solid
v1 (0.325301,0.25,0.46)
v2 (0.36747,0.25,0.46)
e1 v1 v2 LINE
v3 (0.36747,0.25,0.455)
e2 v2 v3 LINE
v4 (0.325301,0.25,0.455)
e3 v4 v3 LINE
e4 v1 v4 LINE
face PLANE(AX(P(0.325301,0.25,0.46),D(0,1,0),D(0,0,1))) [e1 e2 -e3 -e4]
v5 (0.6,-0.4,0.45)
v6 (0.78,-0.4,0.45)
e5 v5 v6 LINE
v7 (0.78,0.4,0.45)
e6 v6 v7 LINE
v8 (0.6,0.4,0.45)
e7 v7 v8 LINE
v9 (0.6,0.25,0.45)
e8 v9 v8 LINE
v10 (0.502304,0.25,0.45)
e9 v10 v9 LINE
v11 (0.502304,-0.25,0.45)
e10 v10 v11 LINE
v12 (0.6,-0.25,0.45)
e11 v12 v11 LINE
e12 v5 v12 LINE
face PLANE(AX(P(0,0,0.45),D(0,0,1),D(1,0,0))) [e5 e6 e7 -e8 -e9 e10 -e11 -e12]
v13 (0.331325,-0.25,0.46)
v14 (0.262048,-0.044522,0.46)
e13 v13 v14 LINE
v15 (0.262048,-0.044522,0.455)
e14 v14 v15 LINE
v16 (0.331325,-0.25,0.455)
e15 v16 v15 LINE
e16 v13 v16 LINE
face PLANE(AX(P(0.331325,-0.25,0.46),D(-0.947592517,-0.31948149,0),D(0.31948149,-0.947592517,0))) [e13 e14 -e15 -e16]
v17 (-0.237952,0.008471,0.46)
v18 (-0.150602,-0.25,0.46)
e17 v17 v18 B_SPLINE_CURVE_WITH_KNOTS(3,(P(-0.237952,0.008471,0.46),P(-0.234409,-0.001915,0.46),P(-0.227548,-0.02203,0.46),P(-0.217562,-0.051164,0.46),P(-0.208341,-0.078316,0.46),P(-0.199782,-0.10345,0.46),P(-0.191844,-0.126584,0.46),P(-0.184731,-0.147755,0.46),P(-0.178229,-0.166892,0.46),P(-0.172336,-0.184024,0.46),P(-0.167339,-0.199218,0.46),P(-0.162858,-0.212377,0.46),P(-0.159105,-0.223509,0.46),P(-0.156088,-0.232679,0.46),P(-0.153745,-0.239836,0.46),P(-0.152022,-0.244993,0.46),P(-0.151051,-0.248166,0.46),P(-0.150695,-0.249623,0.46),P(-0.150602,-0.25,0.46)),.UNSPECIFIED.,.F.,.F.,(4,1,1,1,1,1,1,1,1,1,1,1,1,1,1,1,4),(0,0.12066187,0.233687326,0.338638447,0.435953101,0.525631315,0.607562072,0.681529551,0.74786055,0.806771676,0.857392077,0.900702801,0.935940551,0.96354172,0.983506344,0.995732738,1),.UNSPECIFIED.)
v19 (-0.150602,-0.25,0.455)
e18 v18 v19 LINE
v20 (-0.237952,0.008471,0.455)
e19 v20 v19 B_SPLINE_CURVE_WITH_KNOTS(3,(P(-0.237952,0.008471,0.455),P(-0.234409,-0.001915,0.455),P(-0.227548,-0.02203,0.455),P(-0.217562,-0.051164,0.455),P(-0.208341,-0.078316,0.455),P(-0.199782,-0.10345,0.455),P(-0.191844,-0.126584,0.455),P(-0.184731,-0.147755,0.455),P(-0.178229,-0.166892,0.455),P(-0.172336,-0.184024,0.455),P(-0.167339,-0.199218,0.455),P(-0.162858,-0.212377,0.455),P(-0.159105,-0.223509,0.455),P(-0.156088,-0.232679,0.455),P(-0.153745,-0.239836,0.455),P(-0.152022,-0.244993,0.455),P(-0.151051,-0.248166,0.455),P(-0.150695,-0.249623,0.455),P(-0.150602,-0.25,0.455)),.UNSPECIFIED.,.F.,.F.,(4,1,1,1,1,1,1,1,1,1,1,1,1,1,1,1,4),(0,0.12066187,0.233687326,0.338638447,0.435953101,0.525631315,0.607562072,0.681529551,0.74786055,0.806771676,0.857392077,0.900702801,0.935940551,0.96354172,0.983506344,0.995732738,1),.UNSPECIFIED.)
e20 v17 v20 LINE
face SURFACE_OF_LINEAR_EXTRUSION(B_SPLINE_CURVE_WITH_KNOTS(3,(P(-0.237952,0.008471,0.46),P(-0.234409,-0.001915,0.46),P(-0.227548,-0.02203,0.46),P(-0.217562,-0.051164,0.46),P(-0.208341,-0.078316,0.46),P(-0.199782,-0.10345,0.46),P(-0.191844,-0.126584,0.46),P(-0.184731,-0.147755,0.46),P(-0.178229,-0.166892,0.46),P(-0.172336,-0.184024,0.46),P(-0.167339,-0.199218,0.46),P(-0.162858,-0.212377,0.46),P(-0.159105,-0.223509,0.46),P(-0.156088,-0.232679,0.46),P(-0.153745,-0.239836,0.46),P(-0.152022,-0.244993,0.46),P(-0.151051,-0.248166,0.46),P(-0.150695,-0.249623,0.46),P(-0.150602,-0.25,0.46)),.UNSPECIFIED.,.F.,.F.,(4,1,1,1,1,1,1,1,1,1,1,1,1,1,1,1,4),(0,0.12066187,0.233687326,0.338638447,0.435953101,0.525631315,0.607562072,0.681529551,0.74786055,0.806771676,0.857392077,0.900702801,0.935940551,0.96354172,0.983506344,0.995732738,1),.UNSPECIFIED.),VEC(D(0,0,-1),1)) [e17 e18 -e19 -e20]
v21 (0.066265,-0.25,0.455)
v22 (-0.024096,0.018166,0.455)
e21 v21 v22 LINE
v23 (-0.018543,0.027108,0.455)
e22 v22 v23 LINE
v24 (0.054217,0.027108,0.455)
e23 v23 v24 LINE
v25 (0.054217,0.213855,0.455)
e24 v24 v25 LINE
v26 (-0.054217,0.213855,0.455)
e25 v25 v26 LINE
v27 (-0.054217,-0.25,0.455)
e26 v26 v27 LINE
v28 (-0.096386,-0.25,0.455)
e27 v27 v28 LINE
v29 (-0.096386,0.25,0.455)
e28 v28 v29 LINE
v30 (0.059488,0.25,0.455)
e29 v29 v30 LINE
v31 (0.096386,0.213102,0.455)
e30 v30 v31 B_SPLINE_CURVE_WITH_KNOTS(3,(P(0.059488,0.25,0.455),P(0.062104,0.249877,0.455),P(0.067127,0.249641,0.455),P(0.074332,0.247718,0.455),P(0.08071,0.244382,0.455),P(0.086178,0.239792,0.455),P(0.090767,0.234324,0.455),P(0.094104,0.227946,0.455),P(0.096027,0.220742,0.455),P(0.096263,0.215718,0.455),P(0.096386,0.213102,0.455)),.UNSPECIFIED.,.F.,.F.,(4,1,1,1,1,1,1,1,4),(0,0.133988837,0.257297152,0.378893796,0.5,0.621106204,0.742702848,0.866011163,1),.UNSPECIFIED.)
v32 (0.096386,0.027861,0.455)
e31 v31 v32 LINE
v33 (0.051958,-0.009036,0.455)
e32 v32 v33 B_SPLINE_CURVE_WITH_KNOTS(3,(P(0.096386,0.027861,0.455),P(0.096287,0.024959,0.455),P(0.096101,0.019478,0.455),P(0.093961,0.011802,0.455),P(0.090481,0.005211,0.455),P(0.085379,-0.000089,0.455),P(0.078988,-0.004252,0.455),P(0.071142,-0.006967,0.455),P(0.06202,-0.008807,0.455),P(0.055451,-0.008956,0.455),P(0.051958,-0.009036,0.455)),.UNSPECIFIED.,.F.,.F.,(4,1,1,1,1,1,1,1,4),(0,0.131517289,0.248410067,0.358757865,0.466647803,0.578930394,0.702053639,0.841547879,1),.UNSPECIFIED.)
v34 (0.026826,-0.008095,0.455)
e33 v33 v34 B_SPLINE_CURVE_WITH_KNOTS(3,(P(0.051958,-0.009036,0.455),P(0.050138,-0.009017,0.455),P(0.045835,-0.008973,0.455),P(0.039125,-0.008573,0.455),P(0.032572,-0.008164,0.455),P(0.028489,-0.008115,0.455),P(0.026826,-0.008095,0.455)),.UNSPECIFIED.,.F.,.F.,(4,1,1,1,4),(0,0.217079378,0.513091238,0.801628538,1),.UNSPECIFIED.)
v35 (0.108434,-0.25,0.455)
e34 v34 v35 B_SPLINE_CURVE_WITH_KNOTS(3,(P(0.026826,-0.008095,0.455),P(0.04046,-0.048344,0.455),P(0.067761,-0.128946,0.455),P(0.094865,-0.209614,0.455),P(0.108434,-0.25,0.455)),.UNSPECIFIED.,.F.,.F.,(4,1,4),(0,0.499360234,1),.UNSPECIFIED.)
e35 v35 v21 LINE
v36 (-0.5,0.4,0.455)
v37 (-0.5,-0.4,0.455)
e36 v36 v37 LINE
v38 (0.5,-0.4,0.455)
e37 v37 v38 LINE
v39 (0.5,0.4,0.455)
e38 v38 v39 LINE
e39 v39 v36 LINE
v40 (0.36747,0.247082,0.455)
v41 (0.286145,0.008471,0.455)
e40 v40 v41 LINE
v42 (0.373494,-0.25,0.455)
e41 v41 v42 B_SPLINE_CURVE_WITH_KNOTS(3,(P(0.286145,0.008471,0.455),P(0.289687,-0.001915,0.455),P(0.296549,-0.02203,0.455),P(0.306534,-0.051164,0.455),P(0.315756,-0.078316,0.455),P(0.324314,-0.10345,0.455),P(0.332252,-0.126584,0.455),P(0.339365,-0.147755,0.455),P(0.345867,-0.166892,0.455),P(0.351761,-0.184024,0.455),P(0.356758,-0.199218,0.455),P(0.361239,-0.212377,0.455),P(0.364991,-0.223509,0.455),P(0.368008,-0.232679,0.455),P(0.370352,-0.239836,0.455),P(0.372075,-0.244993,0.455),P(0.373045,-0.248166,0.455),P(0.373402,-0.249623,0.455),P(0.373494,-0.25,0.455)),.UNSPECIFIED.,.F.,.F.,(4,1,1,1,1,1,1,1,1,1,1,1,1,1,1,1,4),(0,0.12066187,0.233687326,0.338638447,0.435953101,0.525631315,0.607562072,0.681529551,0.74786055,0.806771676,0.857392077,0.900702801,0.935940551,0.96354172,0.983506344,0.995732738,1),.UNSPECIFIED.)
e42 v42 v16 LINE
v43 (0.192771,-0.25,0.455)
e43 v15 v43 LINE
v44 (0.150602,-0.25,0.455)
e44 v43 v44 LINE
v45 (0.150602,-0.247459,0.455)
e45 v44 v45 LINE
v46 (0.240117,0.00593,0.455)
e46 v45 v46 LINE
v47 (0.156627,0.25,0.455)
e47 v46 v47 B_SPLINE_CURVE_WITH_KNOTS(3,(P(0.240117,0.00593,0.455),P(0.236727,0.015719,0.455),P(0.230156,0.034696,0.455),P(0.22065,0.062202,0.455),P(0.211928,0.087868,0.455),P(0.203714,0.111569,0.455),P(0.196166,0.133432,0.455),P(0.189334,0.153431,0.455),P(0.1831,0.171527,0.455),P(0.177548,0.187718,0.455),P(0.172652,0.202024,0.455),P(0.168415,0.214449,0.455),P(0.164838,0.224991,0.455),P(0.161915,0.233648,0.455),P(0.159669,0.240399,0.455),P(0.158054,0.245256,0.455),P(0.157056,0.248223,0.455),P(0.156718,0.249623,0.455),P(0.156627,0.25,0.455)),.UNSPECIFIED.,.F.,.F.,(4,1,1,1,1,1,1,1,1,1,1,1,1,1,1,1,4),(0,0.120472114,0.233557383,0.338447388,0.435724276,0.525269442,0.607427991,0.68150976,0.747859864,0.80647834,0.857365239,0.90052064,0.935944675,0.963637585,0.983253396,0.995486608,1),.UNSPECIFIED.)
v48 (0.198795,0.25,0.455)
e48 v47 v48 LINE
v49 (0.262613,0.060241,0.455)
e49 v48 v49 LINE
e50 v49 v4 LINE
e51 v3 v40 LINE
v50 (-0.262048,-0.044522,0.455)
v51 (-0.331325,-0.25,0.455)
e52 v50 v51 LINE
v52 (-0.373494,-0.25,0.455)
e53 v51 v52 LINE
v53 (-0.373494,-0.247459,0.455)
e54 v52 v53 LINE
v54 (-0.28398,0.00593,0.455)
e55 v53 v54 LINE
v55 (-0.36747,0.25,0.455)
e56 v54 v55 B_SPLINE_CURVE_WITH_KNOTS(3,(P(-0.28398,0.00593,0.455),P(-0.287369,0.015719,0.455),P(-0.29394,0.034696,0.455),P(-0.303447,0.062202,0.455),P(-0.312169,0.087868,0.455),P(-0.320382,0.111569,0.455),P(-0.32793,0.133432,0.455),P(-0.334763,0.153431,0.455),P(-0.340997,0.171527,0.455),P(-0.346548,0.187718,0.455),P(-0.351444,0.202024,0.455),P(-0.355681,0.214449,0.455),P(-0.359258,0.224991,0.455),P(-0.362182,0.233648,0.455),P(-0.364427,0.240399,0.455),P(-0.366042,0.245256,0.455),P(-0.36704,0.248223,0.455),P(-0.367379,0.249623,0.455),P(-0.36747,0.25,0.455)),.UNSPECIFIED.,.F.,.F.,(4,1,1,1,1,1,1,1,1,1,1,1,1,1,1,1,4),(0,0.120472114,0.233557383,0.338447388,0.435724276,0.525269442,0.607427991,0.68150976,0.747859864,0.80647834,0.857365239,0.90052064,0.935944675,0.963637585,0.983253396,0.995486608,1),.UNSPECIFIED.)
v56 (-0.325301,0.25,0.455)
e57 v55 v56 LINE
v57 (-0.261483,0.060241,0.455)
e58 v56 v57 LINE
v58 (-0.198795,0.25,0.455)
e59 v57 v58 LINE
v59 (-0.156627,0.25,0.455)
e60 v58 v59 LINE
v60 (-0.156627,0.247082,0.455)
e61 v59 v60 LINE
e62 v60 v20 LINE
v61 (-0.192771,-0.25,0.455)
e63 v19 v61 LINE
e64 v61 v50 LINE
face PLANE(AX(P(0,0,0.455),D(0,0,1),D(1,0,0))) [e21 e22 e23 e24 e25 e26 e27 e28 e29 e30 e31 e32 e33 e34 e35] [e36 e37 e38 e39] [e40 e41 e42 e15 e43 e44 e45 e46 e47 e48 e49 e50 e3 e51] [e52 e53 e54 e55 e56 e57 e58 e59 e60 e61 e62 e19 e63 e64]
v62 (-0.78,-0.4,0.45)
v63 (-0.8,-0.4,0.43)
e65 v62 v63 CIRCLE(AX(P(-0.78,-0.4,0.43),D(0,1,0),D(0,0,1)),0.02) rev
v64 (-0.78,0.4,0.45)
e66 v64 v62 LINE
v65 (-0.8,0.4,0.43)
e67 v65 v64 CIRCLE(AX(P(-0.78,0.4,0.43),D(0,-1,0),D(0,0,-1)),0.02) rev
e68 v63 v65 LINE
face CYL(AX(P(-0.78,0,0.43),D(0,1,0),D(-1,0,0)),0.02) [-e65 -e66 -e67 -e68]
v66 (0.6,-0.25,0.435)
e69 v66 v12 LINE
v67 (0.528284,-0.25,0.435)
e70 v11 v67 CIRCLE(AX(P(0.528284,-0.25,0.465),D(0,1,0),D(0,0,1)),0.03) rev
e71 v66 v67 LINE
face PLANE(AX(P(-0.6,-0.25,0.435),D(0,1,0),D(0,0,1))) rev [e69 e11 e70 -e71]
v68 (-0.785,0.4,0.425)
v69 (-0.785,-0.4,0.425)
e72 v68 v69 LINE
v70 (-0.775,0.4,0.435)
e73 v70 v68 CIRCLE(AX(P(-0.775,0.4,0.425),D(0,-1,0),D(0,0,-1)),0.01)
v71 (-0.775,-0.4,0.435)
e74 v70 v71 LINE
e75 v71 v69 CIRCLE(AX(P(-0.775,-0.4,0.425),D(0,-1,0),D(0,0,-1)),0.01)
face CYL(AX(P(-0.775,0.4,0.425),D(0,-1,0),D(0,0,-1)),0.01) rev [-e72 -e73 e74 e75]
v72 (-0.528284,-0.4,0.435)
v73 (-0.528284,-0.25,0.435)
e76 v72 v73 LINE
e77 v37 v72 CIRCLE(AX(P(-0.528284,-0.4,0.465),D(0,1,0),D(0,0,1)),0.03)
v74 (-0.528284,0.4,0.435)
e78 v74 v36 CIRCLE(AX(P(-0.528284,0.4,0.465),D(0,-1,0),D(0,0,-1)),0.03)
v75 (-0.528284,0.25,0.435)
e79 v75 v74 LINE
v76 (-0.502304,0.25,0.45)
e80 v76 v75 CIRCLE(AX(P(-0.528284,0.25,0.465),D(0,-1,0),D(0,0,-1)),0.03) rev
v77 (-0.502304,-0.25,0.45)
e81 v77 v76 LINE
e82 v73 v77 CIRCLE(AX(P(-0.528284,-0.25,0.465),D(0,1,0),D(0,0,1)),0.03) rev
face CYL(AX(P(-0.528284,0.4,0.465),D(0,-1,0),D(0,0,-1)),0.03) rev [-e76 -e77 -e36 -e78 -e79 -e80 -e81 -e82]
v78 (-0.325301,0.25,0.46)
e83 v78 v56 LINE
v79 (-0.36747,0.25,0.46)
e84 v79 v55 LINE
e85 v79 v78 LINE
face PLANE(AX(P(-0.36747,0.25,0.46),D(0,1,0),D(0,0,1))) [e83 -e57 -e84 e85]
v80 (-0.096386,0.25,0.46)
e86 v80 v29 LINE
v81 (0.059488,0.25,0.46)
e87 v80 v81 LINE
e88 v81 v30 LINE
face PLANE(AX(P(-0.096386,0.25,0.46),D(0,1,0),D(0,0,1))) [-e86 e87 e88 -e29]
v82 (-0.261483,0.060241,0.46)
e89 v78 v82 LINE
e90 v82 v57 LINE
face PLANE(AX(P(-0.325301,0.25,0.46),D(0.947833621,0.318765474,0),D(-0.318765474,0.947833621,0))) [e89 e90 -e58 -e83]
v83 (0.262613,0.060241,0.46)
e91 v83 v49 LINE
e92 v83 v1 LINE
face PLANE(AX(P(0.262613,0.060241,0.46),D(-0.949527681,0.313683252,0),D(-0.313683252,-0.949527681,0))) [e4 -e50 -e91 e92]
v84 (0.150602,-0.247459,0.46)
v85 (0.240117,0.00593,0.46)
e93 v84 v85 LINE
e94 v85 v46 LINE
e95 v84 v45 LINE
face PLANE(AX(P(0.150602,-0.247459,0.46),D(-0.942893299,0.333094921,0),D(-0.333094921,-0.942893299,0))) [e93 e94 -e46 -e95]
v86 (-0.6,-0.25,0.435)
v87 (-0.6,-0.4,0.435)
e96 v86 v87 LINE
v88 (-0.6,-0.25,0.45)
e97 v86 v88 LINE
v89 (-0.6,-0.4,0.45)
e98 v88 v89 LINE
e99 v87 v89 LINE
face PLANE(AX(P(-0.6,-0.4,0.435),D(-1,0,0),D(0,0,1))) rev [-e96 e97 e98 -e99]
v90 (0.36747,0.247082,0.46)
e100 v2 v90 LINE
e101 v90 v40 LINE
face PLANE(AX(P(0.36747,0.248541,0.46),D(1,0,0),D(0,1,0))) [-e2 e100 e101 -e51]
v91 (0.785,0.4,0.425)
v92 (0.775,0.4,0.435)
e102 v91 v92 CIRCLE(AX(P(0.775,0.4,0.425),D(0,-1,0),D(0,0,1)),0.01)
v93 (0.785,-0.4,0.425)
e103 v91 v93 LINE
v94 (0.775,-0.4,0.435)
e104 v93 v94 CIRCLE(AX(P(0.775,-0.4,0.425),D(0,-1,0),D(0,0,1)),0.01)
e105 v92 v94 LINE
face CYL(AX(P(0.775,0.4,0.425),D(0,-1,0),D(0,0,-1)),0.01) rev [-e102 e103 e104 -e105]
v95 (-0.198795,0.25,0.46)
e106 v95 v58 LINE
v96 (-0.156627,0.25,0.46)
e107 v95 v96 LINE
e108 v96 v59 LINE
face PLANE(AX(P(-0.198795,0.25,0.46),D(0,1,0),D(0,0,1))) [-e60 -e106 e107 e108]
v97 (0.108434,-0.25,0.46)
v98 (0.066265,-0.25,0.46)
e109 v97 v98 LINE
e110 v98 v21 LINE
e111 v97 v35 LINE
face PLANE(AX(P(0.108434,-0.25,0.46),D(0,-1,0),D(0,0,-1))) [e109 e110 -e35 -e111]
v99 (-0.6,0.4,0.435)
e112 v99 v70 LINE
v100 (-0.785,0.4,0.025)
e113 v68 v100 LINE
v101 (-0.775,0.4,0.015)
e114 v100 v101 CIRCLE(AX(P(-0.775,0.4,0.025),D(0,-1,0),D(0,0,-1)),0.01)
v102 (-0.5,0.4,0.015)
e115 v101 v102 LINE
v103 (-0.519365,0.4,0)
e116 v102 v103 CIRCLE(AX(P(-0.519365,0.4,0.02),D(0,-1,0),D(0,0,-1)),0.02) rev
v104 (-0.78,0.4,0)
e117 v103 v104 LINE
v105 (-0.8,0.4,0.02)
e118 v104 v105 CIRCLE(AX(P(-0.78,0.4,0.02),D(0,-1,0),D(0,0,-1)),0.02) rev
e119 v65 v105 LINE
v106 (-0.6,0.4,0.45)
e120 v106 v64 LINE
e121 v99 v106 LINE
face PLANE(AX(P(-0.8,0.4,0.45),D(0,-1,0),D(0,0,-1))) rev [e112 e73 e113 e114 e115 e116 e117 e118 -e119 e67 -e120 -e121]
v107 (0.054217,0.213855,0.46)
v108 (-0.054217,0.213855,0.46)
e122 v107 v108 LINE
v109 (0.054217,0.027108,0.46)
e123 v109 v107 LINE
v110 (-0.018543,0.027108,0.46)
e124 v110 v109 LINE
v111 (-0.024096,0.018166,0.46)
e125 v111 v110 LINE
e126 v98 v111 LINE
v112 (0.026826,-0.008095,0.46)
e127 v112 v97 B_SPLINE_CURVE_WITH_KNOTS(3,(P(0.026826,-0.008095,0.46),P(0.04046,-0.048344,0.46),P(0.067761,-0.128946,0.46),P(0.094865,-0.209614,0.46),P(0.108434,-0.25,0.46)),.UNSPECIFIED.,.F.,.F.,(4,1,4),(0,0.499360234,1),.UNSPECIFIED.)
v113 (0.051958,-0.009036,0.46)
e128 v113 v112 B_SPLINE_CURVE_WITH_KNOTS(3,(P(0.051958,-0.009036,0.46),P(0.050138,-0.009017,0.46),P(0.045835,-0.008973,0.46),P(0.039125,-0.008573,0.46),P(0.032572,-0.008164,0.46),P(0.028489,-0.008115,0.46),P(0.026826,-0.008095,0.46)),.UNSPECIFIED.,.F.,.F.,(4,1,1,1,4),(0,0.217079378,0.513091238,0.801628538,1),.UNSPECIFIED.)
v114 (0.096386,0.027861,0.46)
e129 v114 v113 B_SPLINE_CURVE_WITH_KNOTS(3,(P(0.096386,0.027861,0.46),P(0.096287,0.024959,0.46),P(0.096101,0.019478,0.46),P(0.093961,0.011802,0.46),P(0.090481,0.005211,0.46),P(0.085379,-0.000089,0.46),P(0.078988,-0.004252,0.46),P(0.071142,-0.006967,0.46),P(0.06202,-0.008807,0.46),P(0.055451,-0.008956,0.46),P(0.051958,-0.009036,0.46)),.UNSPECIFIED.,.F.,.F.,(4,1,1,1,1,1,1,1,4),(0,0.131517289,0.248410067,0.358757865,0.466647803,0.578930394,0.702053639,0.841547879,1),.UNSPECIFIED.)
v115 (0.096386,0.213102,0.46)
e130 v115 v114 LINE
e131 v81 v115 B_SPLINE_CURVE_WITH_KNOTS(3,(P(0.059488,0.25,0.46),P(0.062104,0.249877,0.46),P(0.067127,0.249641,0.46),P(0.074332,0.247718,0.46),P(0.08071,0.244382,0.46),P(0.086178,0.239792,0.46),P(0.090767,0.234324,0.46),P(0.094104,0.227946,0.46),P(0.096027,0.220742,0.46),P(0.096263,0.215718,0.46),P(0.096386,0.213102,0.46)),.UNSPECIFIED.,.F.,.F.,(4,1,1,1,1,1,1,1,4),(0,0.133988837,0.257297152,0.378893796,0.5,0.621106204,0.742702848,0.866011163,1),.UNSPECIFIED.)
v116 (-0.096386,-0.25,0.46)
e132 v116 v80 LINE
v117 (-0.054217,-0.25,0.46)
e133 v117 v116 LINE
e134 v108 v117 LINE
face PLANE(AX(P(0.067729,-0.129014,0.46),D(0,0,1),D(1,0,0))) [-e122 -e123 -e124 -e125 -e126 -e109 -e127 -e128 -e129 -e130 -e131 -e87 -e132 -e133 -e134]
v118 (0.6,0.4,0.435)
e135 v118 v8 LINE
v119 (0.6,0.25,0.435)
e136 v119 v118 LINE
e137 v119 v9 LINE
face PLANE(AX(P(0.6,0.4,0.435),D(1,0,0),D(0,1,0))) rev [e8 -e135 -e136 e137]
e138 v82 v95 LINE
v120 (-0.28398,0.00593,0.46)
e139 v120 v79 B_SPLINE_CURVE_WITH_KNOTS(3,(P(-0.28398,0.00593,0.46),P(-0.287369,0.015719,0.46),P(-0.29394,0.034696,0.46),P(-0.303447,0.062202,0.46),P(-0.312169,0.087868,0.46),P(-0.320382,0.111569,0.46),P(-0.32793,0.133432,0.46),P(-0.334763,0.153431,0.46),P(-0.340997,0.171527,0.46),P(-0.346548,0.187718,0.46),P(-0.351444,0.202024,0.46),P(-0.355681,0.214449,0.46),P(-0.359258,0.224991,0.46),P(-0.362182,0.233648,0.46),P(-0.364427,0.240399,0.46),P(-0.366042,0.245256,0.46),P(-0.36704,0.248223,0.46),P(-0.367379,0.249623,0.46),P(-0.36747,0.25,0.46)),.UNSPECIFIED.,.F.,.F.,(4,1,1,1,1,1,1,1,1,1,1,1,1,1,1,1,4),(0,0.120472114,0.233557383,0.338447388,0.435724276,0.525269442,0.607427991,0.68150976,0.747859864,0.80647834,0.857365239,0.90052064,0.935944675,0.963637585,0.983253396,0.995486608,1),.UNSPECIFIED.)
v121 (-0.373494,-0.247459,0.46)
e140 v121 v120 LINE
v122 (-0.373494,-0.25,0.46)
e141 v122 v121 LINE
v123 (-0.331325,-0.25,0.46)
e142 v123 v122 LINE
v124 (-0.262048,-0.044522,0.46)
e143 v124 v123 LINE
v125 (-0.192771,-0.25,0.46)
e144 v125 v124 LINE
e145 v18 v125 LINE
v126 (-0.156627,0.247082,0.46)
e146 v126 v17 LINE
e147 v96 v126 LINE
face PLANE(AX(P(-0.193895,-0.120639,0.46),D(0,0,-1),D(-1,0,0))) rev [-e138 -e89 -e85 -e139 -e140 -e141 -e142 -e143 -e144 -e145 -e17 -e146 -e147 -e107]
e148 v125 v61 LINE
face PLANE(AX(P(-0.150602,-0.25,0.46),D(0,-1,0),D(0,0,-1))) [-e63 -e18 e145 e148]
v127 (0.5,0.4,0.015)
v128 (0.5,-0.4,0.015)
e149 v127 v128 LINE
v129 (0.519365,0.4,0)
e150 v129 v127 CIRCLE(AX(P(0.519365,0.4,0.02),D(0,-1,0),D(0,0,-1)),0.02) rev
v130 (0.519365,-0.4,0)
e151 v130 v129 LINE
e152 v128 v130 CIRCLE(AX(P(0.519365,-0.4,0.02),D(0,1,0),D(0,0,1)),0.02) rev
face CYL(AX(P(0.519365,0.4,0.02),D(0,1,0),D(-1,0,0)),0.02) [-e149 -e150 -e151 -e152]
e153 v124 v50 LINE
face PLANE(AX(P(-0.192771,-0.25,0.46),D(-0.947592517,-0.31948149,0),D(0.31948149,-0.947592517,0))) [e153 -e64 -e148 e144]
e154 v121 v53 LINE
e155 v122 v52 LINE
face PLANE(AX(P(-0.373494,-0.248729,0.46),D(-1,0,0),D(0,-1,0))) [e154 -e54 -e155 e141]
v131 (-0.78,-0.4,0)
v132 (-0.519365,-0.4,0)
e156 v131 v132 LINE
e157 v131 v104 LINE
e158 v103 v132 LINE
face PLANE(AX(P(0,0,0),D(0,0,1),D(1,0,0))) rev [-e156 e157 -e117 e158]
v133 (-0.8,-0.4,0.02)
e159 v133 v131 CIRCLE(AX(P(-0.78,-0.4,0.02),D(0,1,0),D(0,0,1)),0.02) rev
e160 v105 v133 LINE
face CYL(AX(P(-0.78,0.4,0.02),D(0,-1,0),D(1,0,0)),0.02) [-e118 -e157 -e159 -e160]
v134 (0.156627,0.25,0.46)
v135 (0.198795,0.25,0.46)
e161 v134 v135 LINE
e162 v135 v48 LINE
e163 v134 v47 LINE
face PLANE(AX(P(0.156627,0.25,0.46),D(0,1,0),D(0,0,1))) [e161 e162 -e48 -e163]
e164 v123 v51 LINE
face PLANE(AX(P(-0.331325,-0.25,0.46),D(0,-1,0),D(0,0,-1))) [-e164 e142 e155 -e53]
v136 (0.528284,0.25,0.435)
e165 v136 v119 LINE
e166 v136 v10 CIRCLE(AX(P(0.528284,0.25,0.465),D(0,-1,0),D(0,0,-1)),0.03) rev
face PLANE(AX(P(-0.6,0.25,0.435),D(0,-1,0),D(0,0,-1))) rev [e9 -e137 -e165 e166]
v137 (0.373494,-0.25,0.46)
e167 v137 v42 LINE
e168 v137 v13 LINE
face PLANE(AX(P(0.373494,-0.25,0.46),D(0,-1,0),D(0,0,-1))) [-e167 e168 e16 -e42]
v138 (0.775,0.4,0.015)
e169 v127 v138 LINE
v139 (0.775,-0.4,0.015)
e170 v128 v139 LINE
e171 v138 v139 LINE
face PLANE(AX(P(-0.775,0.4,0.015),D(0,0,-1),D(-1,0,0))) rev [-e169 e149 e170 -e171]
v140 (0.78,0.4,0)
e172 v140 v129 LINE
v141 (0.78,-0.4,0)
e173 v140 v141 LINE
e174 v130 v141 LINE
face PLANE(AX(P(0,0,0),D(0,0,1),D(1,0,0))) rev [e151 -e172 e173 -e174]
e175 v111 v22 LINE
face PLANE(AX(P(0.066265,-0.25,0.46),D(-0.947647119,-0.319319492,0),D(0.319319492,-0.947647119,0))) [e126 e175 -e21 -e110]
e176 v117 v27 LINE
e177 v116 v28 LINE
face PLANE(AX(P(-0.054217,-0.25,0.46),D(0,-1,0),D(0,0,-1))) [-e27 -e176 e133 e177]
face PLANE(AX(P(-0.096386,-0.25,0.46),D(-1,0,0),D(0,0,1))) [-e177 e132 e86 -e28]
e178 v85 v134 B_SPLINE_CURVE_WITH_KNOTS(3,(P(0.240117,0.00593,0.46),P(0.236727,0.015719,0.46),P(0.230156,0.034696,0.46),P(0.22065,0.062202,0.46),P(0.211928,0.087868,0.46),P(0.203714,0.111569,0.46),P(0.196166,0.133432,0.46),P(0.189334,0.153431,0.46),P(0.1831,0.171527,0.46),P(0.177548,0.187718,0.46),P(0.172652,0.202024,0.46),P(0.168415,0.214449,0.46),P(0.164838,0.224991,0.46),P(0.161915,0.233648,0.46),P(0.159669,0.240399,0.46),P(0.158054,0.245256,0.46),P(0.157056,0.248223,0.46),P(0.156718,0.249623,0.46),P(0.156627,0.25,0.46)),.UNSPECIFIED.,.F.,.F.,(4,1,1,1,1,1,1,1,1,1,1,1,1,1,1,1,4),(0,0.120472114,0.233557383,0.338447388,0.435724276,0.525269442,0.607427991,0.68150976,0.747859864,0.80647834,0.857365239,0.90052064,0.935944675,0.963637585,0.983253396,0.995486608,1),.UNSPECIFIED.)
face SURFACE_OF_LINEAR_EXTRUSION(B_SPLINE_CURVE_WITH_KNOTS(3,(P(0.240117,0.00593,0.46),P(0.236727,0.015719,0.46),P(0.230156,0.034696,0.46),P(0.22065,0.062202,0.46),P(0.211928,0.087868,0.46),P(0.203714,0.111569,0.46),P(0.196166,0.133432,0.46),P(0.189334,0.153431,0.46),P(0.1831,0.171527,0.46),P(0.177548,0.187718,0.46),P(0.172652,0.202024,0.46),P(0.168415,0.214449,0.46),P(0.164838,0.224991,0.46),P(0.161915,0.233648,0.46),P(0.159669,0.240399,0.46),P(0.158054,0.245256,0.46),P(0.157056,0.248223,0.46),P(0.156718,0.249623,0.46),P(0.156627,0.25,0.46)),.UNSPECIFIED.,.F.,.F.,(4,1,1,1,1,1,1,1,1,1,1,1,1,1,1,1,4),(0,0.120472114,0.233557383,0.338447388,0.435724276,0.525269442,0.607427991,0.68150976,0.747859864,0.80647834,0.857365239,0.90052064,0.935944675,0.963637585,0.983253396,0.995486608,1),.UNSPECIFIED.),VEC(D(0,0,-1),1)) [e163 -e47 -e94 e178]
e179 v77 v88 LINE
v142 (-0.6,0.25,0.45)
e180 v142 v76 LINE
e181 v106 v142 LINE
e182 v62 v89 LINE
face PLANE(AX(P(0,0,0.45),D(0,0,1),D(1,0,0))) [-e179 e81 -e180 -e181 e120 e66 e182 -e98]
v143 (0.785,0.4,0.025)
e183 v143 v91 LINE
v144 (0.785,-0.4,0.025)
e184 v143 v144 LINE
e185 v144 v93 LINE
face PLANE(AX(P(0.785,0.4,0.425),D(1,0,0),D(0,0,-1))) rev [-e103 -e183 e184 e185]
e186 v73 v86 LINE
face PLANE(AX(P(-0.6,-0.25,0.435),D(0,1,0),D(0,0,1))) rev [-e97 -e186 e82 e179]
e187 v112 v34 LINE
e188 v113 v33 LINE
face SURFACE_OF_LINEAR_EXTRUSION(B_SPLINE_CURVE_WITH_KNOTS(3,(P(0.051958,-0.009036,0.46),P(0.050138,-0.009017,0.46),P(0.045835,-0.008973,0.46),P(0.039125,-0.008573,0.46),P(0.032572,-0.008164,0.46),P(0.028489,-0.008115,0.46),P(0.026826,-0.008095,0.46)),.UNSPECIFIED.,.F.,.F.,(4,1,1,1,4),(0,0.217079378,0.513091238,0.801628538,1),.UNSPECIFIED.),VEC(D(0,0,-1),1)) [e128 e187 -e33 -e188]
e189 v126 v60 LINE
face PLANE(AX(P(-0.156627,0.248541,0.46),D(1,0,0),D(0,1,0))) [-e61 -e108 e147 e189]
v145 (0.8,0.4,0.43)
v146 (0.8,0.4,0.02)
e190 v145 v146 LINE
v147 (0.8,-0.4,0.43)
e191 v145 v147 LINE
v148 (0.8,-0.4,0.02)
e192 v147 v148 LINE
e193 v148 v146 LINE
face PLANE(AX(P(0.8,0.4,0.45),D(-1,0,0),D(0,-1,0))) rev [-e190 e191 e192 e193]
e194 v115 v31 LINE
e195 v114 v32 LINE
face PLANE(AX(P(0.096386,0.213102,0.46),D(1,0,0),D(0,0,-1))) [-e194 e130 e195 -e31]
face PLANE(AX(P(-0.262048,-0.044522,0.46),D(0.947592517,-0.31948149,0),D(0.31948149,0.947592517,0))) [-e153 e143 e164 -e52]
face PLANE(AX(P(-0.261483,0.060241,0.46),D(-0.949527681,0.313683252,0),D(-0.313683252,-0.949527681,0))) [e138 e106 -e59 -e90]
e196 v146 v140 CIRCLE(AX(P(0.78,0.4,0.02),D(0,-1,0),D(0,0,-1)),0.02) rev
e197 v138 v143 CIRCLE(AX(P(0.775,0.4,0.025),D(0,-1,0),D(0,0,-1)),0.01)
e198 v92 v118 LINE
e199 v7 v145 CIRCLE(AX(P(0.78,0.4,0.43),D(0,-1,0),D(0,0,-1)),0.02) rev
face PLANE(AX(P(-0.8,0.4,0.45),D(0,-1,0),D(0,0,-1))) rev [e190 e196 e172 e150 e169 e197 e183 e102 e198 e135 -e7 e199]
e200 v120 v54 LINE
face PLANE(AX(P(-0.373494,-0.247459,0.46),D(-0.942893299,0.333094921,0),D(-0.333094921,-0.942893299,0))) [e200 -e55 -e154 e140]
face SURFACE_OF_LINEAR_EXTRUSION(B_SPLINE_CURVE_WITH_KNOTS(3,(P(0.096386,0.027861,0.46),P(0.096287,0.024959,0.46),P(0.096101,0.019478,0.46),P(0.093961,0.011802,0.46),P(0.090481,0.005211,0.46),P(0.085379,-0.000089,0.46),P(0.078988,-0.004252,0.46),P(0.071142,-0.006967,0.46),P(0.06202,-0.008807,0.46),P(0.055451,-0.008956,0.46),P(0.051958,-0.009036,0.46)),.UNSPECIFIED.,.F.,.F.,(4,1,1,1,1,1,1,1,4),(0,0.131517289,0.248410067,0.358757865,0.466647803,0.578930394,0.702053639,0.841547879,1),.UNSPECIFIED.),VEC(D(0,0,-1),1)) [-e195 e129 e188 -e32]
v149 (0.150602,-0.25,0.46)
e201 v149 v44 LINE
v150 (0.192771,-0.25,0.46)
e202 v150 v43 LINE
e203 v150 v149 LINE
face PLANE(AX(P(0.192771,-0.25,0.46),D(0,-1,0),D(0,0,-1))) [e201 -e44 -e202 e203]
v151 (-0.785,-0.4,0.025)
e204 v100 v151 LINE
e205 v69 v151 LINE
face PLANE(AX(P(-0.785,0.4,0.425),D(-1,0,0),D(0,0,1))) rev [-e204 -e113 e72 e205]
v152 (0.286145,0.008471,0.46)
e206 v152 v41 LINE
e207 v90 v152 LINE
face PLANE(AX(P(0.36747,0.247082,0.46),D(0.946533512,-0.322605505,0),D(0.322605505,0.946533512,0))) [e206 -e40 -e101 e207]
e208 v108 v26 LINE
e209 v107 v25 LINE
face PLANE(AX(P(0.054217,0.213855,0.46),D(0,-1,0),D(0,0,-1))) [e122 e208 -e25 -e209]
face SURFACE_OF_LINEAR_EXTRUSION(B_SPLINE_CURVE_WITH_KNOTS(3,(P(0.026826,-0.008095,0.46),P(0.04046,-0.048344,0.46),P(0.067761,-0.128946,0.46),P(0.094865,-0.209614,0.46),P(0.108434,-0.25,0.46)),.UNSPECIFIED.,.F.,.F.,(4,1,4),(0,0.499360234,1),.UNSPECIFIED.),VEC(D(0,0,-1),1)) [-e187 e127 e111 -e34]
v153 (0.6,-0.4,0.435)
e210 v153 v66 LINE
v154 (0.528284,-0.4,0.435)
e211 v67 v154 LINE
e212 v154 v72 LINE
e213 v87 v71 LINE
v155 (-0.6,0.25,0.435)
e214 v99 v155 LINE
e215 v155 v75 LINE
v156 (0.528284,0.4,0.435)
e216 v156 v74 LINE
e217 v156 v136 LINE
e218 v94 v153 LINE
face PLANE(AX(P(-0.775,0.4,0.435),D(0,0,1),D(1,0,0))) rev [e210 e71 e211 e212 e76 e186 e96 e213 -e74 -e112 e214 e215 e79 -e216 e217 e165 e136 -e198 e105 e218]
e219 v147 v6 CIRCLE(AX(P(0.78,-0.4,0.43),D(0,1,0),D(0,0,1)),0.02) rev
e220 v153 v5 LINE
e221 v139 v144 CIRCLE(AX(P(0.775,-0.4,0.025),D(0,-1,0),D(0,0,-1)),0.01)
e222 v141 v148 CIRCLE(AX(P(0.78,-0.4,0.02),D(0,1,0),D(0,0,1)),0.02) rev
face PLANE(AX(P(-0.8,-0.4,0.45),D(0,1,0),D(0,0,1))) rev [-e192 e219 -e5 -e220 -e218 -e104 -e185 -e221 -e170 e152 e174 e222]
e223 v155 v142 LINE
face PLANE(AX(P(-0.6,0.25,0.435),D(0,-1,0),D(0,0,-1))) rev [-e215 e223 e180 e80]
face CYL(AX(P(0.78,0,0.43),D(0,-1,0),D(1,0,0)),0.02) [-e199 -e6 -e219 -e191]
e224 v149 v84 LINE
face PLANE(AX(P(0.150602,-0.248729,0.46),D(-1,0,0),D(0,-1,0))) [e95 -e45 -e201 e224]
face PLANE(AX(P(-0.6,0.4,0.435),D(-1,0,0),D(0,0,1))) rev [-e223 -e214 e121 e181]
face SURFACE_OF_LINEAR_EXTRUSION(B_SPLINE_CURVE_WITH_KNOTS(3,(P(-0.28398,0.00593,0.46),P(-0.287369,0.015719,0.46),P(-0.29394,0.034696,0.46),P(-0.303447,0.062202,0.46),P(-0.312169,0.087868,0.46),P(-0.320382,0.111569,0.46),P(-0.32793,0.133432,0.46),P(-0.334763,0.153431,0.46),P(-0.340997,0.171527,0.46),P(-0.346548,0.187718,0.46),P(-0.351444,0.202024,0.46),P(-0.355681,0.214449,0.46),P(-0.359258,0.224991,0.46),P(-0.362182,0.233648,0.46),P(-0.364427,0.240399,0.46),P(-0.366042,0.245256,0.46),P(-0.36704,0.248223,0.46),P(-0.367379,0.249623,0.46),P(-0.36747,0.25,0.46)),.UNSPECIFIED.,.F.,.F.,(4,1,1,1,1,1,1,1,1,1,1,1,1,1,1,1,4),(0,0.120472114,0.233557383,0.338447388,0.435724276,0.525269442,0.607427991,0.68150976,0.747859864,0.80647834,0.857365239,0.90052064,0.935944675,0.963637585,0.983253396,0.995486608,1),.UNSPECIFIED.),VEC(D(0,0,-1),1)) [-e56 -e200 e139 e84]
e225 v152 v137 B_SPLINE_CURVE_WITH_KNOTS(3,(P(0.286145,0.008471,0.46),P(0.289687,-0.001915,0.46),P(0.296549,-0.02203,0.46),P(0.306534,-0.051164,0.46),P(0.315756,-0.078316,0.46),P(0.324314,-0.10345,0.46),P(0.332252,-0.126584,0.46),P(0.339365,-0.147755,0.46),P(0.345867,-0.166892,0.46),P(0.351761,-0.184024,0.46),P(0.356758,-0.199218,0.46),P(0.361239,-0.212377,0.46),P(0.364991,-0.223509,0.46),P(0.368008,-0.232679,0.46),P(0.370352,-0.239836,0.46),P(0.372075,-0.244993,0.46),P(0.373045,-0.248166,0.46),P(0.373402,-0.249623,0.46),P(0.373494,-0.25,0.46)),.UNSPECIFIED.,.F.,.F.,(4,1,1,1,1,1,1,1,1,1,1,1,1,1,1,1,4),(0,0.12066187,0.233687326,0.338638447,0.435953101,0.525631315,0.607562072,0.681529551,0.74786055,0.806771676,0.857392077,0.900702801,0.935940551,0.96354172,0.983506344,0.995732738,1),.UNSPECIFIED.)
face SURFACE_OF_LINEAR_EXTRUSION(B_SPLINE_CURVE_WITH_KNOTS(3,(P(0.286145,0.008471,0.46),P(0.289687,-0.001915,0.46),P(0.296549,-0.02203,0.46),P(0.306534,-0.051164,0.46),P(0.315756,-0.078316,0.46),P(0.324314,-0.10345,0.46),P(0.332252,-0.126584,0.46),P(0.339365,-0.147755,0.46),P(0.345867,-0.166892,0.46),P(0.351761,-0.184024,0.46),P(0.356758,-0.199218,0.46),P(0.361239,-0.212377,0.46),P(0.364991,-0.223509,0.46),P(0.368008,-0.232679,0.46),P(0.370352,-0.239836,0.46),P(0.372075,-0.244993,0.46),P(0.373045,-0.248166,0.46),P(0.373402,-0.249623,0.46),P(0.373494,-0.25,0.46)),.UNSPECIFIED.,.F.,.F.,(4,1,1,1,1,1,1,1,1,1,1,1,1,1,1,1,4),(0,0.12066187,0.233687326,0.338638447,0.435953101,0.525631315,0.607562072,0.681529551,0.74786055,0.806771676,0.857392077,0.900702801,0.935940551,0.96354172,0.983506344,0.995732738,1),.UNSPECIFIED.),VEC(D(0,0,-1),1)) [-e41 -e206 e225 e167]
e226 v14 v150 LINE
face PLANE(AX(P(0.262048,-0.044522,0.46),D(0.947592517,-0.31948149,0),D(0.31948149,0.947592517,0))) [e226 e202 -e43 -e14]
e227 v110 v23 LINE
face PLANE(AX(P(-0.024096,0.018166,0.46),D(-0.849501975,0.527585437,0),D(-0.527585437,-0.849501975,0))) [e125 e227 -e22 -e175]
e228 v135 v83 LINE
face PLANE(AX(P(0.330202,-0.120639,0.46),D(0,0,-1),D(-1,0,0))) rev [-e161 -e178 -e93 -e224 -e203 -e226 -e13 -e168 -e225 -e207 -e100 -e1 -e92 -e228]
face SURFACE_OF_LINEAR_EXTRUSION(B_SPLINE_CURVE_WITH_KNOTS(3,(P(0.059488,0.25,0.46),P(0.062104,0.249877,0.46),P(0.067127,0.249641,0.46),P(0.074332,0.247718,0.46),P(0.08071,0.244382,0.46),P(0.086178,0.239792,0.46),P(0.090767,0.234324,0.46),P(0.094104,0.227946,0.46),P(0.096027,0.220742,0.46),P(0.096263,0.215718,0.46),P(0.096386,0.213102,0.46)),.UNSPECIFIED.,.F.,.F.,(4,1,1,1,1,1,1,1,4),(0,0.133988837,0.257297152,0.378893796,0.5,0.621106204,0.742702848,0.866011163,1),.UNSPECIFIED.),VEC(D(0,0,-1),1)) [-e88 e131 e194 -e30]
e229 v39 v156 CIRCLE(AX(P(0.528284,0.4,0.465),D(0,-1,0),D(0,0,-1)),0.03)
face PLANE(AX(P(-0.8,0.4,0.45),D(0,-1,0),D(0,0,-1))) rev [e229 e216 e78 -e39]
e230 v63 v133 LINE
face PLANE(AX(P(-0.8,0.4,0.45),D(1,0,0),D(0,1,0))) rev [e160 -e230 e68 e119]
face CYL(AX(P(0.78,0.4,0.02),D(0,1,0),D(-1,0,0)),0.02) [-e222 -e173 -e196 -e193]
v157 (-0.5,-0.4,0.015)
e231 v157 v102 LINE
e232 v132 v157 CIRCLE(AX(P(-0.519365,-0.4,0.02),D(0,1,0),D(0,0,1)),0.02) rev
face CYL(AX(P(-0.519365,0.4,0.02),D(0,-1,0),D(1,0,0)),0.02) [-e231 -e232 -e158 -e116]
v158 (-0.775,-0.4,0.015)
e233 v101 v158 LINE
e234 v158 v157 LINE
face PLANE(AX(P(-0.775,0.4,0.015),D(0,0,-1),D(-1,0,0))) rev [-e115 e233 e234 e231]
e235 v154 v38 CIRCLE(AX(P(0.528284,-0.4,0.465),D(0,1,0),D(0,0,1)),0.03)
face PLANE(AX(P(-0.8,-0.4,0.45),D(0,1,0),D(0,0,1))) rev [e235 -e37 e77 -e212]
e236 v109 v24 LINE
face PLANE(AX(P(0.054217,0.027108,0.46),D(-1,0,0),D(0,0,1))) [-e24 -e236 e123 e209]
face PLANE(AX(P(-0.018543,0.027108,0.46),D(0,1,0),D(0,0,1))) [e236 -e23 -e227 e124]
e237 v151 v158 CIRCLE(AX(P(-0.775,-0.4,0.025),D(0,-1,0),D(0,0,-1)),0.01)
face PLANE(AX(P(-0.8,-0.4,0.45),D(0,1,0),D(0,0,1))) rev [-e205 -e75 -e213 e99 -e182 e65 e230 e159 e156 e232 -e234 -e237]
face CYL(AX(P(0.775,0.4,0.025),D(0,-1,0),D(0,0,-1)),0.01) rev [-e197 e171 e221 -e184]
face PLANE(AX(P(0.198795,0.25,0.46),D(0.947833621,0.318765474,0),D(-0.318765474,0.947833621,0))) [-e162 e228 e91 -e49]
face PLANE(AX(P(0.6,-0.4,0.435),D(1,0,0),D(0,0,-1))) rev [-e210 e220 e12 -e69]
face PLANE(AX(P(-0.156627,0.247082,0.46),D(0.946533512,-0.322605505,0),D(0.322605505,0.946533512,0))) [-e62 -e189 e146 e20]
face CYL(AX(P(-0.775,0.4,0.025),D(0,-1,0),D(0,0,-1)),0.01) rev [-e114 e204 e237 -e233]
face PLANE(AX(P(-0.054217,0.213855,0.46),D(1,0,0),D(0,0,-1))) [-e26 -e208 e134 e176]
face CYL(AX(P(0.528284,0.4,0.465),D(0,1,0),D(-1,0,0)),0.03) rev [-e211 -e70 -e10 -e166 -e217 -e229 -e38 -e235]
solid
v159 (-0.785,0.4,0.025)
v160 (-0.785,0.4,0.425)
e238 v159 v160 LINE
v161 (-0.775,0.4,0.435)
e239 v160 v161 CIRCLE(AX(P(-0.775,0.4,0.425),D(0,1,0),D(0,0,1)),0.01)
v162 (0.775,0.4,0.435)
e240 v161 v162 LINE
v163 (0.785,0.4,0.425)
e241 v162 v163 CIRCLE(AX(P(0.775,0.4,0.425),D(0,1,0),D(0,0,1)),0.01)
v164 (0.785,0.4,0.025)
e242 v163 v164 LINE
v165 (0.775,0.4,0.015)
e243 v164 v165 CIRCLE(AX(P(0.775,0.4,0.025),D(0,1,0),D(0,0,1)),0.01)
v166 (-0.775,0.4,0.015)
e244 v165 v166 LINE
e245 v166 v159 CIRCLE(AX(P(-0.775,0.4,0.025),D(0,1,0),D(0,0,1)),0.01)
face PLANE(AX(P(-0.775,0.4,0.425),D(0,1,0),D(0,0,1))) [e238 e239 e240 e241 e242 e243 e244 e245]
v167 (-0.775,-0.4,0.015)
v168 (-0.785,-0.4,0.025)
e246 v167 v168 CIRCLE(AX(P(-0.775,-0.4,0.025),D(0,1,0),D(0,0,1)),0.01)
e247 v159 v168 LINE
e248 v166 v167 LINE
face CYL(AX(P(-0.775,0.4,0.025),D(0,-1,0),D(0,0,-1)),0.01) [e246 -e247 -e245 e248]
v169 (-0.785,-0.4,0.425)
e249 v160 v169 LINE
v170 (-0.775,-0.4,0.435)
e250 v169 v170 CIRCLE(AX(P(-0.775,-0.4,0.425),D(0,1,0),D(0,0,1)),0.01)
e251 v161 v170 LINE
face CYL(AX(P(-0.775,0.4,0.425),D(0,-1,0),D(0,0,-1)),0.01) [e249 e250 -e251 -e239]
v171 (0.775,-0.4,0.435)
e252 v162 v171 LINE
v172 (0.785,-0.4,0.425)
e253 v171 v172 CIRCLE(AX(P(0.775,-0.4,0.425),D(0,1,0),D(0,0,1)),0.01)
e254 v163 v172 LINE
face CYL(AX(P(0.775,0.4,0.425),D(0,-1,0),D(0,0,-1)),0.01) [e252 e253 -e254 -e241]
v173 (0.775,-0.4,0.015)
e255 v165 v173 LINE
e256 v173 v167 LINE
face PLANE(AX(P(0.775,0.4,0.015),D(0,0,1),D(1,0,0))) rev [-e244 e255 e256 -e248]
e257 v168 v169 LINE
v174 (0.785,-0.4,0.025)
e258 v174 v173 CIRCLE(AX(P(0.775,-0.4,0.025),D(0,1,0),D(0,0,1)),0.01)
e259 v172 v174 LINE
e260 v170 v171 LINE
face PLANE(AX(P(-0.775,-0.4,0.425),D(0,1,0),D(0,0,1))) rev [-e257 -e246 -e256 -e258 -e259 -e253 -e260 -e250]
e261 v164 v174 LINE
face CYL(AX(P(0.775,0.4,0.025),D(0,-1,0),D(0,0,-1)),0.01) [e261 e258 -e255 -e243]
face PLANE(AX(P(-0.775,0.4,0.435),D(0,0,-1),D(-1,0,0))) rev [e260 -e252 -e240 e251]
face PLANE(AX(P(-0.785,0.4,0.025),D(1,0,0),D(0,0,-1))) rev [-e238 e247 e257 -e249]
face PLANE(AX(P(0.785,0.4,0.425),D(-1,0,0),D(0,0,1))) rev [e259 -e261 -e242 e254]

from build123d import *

# Parameters (mm, degrees)
SKETCH1_W                        = 1.6
SKETCH1_H                        = 0.8
ALL_BODY_EXTRUDE_DEPTH           = 0.45
SKETCH3_W                        = 1.2
SKETCH3_H                        = 0.15
CUT_OUT_FOR_PIN_UPPER_DEPTH      = 0.015
SKETCH2_W                        = 1
SKETCH2_H                        = 0.8
CUT_OUT_FOR_PIN_LOWER_DEPTH      = 0.015
SKETCH4_W                        = 1
SKETCH4_H                        = 0.8
COATING_EXTRUDE_DEPTH            = 0.02
COATING_START                    = -0.4
COATING_FILLET_DEPTH             = 0.8
BODY_CUT_OUT_FOR_TOTAL_PIN_DEPTH = 2.219436345
BODY_EXTRUDE_DEPTH               = 0.8
PIN_FILLET_R                     = 0.02
RESISTANT_VALUE_DEPTH            = 0.005


with BuildPart() as part:
    # Sketch1 → All body extrude (new body)
    with BuildSketch(Plane.XY):
        Rectangle(SKETCH1_W, SKETCH1_H)
    extrude(amount=ALL_BODY_EXTRUDE_DEPTH)

    # Sketch3 → Cut out for pin-upper (cut)
    with BuildSketch(Plane.XY.offset(0.45)):
        with Locations((0, 0.325)):
            Rectangle(SKETCH3_W, SKETCH3_H)
        with Locations((0, -0.325)):
            Rectangle(SKETCH3_W, SKETCH3_H)
    extrude(amount=-CUT_OUT_FOR_PIN_UPPER_DEPTH, mode=Mode.SUBTRACT)

    # Sketch2 → Cut out for pin-lower (cut)
    with BuildSketch(Plane(origin=(0, 0, 0), x_dir=(-1, 0, 0), z_dir=(0, 0, -1))):
        Rectangle(SKETCH2_W, SKETCH2_H)
    extrude(amount=-CUT_OUT_FOR_PIN_LOWER_DEPTH, mode=Mode.SUBTRACT)

    # Sketch4 → Coating extrude (add)
    with BuildSketch(Plane.XY.offset(0.435)):
        Rectangle(SKETCH4_W, SKETCH4_H)
    extrude(amount=COATING_EXTRUDE_DEPTH)

    # Coating fillet: read off the stored shape, not the designer's step
    # Coating fillet outline → Coating fillet (add)
    with BuildSketch(Plane(origin=(0, 0, 0), x_dir=(1, 0, 0), z_dir=(0, 1, 0)).offset(COATING_START)):
        with BuildLine():
            Line((-0.5, -0.435), (-0.528284271, -0.435))
            ThreePointArc((-0.528284271, -0.435), (-0.510963763, -0.440505103), (-0.5, -0.455))
            Line((-0.5, -0.455), (-0.5, -0.435))
        make_face()
        with BuildLine():
            ThreePointArc((0.5, -0.455), (0.510963763, -0.440505103), (0.528284271, -0.435))
            Line((0.528284271, -0.435), (0.5, -0.435))
            Line((0.5, -0.435), (0.5, -0.455))
        make_face()
    extrude(amount=COATING_FILLET_DEPTH)

    # Sketch6 → Body cut out for total pin (cut, through all)
    with BuildSketch(Plane.XZ.offset(0.4)):
        with BuildLine():
            Line((-0.775, 0.435), (0.775, 0.435))
            ThreePointArc((0.775, 0.435), (0.782071068, 0.432071068), (0.785, 0.425))
            Line((0.785, 0.425), (0.785, 0.025))
            ThreePointArc((0.785, 0.025), (0.782071068, 0.017928932), (0.775, 0.015))
            Line((0.775, 0.015), (-0.775, 0.015))
            ThreePointArc((-0.775, 0.015), (-0.782071068, 0.017928932), (-0.785, 0.025))
            Line((-0.785, 0.025), (-0.785, 0.425))
            ThreePointArc((-0.785, 0.425), (-0.782071068, 0.432071068), (-0.775, 0.435))
        make_face()
    extrude(amount=-BODY_CUT_OUT_FOR_TOTAL_PIN_DEPTH, mode=Mode.SUBTRACT)

    # Pin fillet
    # the kernel refuses this fillet: 0.02 mm, written as the material it takes off along each edge
    with BuildSketch(Plane(origin=(0.8, 0.45, 0.45), x_dir=(-1, 0, 0), z_dir=(0, -1, 0)), Plane(origin=(-0.8, -0.45, 0.45), x_dir=(1, 0, 0), z_dir=(0, 1, 0))) as pin_fillet_piece_1:
        with BuildLine():
            CenterArc((PIN_FILLET_R, PIN_FILLET_R), PIN_FILLET_R, 180, 90)
            Line((0, PIN_FILLET_R), (-PIN_FILLET_R * 0.02, PIN_FILLET_R))
            Line((-PIN_FILLET_R * 0.02, PIN_FILLET_R), (-PIN_FILLET_R * 0.02, -PIN_FILLET_R * 0.02))
            Line((-PIN_FILLET_R * 0.02, -PIN_FILLET_R * 0.02), (PIN_FILLET_R, -PIN_FILLET_R * 0.02))
            Line((PIN_FILLET_R, -PIN_FILLET_R * 0.02), (PIN_FILLET_R, 0))
        make_face()
    extrude(amount=0.9, mode=Mode.SUBTRACT)
    with BuildSketch(Plane(origin=(0.8, 0.45, 0), x_dir=(-1, 0, 0), z_dir=(0, -1, 0)), Plane(origin=(-0.8, -0.45, 0), x_dir=(1, 0, 0), z_dir=(0, 1, 0))) as pin_fillet_piece_2:
        with BuildLine():
            CenterArc((PIN_FILLET_R, -PIN_FILLET_R), PIN_FILLET_R, 90, 90)
            Line((0, -PIN_FILLET_R), (-PIN_FILLET_R * 0.02, -PIN_FILLET_R))
            Line((-PIN_FILLET_R * 0.02, -PIN_FILLET_R), (-PIN_FILLET_R * 0.02, PIN_FILLET_R * 0.02))
            Line((-PIN_FILLET_R * 0.02, PIN_FILLET_R * 0.02), (PIN_FILLET_R, PIN_FILLET_R * 0.02))
            Line((PIN_FILLET_R, PIN_FILLET_R * 0.02), (PIN_FILLET_R, 0))
        make_face()
    extrude(amount=0.9, mode=Mode.SUBTRACT)
    with BuildSketch(Plane(origin=(0.5, -0.448412292, 0), x_dir=(1, 0, 0), z_dir=(0, 1, 0)), Plane(origin=(-0.5, 0.448412292, 0), x_dir=(-1, 0, 0), z_dir=(0, -1, 0))) as pin_fillet_piece_3:
        with BuildLine():
            CenterArc((0.019364917, -0.02), PIN_FILLET_R, 90, 75.522487815)
            Line((0, -0.015), (-0.000387298, -0.0149))
            ThreePointArc((-0.000387298, -0.0149), (-0.0004, -0.0075), (-0.0004, 0))
            Line((-0.0004, 0), (0, 0.0004))
            Line((0, 0.0004), (0.019364917, 0.0004))
            Line((0.019364917, 0.0004), (0.019364917, 0))
        make_face()
    extrude(amount=0.896824584, mode=Mode.SUBTRACT)

    # Sketch21 → Resistant Value (add)
    with BuildSketch(Plane.XY.offset(0.455)):
        with BuildLine():
            Line((-0.15060241, -0.25), (-0.192771084, -0.25))
            Line((-0.192771084, -0.25), (-0.262048193, -0.044521837))
            Line((-0.262048193, -0.044521837), (-0.331325301, -0.25))
            Line((-0.331325301, -0.25), (-0.373493976, -0.25))
            add(Edge.make_bspline(
                [(-0.373493976, -0.25), (-0.373493976, -0.249403865), (-0.373493976, -0.248556727), (-0.373493976, -0.247709588), (-0.373493976, -0.247458584)],
                knots=[0, 0, 0, 0, 1.407407407, 2, 2, 2, 2], degree=3))
            Line((-0.373493976, -0.247458584), (-0.283979669, 0.00592997))
            add(Edge.make_bspline(
                [(-0.283979669, 0.00592997), (-0.287369221, 0.015718776), (-0.293940494, 0.034696181), (-0.303446592, 0.062202007), (-0.312168651, 0.087868229), (-0.320381964, 0.111568972), (-0.327929901, 0.133431579), (-0.334762854, 0.153430926), (-0.340996532, 0.171527269), (-0.34654818, 0.187717652), (-0.351444062, 0.202024454), (-0.355681131, 0.214448656), (-0.359258467, 0.224990776), (-0.362181609, 0.233648362), (-0.364427248, 0.240399454), (-0.366041932, 0.245256043), (-0.367040359, 0.248222645), (-0.367378694, 0.249622676), (-0.36746988, 0.25)],
                knots=[0, 0, 0, 0, 1.927553832, 3.736918121, 5.415158206, 6.971588422, 8.404311079, 9.718847863, 10.904156158, 11.965757829, 12.903653443, 13.717843825, 14.408330246, 14.975114804, 15.418201358, 15.732054334, 15.927785727, 16, 16, 16, 16], degree=3))
            Line((-0.36746988, 0.25), (-0.325301205, 0.25))
            Line((-0.325301205, 0.25), (-0.261483434, 0.060240964))
            Line((-0.261483434, 0.060240964), (-0.198795181, 0.25))
            Line((-0.198795181, 0.25), (-0.156626506, 0.25))
            add(Edge.make_bspline(
                [(-0.156626506, 0.25), (-0.156626506, 0.24937249), (-0.156626506, 0.248399849), (-0.156626506, 0.247427209), (-0.156626506, 0.247082078)],
                knots=[0, 0, 0, 0, 1.290322581, 2, 2, 2, 2], degree=3))
            Line((-0.156626506, 0.247082078), (-0.237951807, 0.008471386))
            add(Edge.make_bspline(
                [(-0.237951807, 0.008471386), (-0.234408977, -0.001914794), (-0.227547533, -0.022029835), (-0.217562137, -0.051164243), (-0.208340778, -0.078315791), (-0.199782271, -0.103449949), (-0.191844395, -0.126583788), (-0.184731148, -0.147755234), (-0.178229466, -0.166891911), (-0.172335744, -0.184024219), (-0.167338787, -0.199218059), (-0.162857649, -0.212376503), (-0.159104979, -0.223508598), (-0.156088206, -0.232679019), (-0.153744651, -0.239836115), (-0.152021819, -0.244993203), (-0.151051417, -0.248165867), (-0.1506947, -0.249623007), (-0.15060241, -0.25)],
                knots=[0, 0, 0, 0, 1.93058992, 3.738997214, 5.418215154, 6.975249619, 8.410101043, 9.72099315, 10.904472811, 11.965768803, 12.908346819, 13.718273231, 14.411244822, 14.975048819, 15.416667524, 15.73610151, 15.931723813, 16, 16, 16, 16], degree=3))
        make_face()
        with BuildLine():
            Line((0.108433735, -0.25), (0.06626506, -0.25))
            Line((0.06626506, -0.25), (-0.024096386, 0.018166416))
            Line((-0.024096386, 0.018166416), (-0.018542922, 0.027108434))
            Line((-0.018542922, 0.027108434), (0.054216867, 0.027108434))
            Line((0.054216867, 0.027108434), (0.054216867, 0.213855422))
            Line((0.054216867, 0.213855422), (-0.054216867, 0.213855422))
            Line((-0.054216867, 0.213855422), (-0.054216867, -0.25))
            Line((-0.054216867, -0.25), (-0.096385542, -0.25))
            Line((-0.096385542, -0.25), (-0.096385542, 0.25))
            Line((-0.096385542, 0.25), (0.059487952, 0.25))
            add(Edge.make_bspline(
                [(0.059487952, 0.25), (0.062103971, 0.249877071), (0.067127481, 0.249641012), (0.074331978, 0.247718101), (0.080709581, 0.244381847), (0.086177901, 0.239792359), (0.090767389, 0.234324039), (0.094103644, 0.227946436), (0.096026554, 0.220741939), (0.096262613, 0.215718429), (0.096385542, 0.21310241)],
                knots=[0, 0, 0, 0, 1.071910697, 2.058377219, 3.031150369, 4, 4.968849631, 5.941622781, 6.928089303, 8, 8, 8, 8], degree=3))
            Line((0.096385542, 0.21310241), (0.096385542, 0.027861446))
            add(Edge.make_bspline(
                [(0.096385542, 0.027861446), (0.096286982, 0.024959336), (0.09610082, 0.019477825), (0.093960612, 0.011801913), (0.090480524, 0.005210807), (0.085378935, -8.8619e-05), (0.078988486, -0.004252378), (0.071141568, -0.006967465), (0.062020416, -0.008806596), (0.055451353, -0.00895645), (0.051957831, -0.009036145)],
                knots=[0, 0, 0, 0, 1.052138315, 1.987280534, 2.870062918, 3.733182423, 4.631443151, 5.616429111, 6.732383034, 8, 8, 8, 8], degree=3))
            add(Edge.make_bspline(
                [(0.051957831, -0.009036145), (0.050137627, -0.009017433), (0.045835371, -0.008973205), (0.039124877, -0.008572511), (0.032571995, -0.008164128), (0.02848936, -0.008114925), (0.026826054, -0.00809488)],
                knots=[0, 0, 0, 0, 0.868317512, 2.052364952, 3.206514152, 4, 4, 4, 4], degree=3))
            add(Edge.make_bspline(
                [(0.026826054, -0.00809488), (0.040459525, -0.048344081), (0.067761401, -0.128945617), (0.09486473, -0.209614133), (0.108433735, -0.25)],
                knots=[0, 0, 0, 0, 0.998720468, 2, 2, 2, 2], degree=3))
        make_face()
        with BuildLine():
            Line((0.373493976, -0.25), (0.331325301, -0.25))
            Line((0.331325301, -0.25), (0.262048193, -0.044521837))
            Line((0.262048193, -0.044521837), (0.192771084, -0.25))
            Line((0.192771084, -0.25), (0.15060241, -0.25))
            add(Edge.make_bspline(
                [(0.15060241, -0.25), (0.15060241, -0.249403865), (0.15060241, -0.248556727), (0.15060241, -0.247709588), (0.15060241, -0.247458584)],
                knots=[0, 0, 0, 0, 1.407407407, 2, 2, 2, 2], degree=3))
            Line((0.15060241, -0.247458584), (0.240116717, 0.00592997))
            add(Edge.make_bspline(
                [(0.240116717, 0.00592997), (0.236727164, 0.015718776), (0.230155892, 0.034696181), (0.220649794, 0.062202007), (0.211927734, 0.087868229), (0.203714422, 0.111568972), (0.196166485, 0.133431579), (0.189333531, 0.153430926), (0.183099854, 0.171527269), (0.177548206, 0.187717652), (0.172652324, 0.202024454), (0.168415254, 0.214448656), (0.164837919, 0.224990776), (0.161914777, 0.233648362), (0.159669137, 0.240399454), (0.158054454, 0.245256043), (0.157056026, 0.248222645), (0.156717691, 0.249622676), (0.156626506, 0.25)],
                knots=[0, 0, 0, 0, 1.927553832, 3.736918121, 5.415158206, 6.971588422, 8.404311079, 9.718847863, 10.904156158, 11.965757829, 12.903653443, 13.717843825, 14.408330246, 14.975114804, 15.418201358, 15.732054334, 15.927785727, 16, 16, 16, 16], degree=3))
            Line((0.156626506, 0.25), (0.198795181, 0.25))
            Line((0.198795181, 0.25), (0.262612952, 0.060240964))
            Line((0.262612952, 0.060240964), (0.325301205, 0.25))
            Line((0.325301205, 0.25), (0.36746988, 0.25))
            add(Edge.make_bspline(
                [(0.36746988, 0.25), (0.36746988, 0.24937249), (0.36746988, 0.248399849), (0.36746988, 0.247427209), (0.36746988, 0.247082078)],
                knots=[0, 0, 0, 0, 1.290322581, 2, 2, 2, 2], degree=3))
            Line((0.36746988, 0.247082078), (0.286144578, 0.008471386))
            add(Edge.make_bspline(
                [(0.286144578, 0.008471386), (0.289687409, -0.001914794), (0.296548852, -0.022029835), (0.306534249, -0.051164243), (0.315755608, -0.078315791), (0.324314114, -0.103449949), (0.332251991, -0.126583788), (0.339365238, -0.147755234), (0.345866919, -0.166891911), (0.351760642, -0.184024219), (0.356757599, -0.199218059), (0.361238737, -0.212376503), (0.364991407, -0.223508598), (0.36800818, -0.232679019), (0.370351735, -0.239836115), (0.372074566, -0.244993203), (0.373044968, -0.248165867), (0.373401685, -0.249623007), (0.373493976, -0.25)],
                knots=[0, 0, 0, 0, 1.93058992, 3.738997214, 5.418215154, 6.975249619, 8.410101043, 9.72099315, 10.904472811, 11.965768803, 12.908346819, 13.718273231, 14.411244822, 14.975048819, 15.416667524, 15.73610151, 15.931723813, 16, 16, 16, 16], degree=3))
        make_face()
    extrude(amount=RESISTANT_VALUE_DEPTH)


with BuildPart() as body_2:
    # Sketch7 → Body extrude (new, through all)
    with BuildSketch(Plane(origin=(0, -0.4, 0), x_dir=(1, 0, 0), z_dir=(0, 1, 0))):
        with BuildLine():
            Line((-0.775, -0.435), (0.775, -0.435))
            ThreePointArc((0.775, -0.435), (0.782071068, -0.432071068), (0.785, -0.425))
            Line((0.785, -0.425), (0.785, -0.025))
            ThreePointArc((0.785, -0.025), (0.782071068, -0.017928932), (0.775, -0.015))
            Line((0.775, -0.015), (-0.775, -0.015))
            ThreePointArc((-0.775, -0.015), (-0.782071068, -0.017928932), (-0.785, -0.025))
            Line((-0.785, -0.025), (-0.785, -0.425))
            ThreePointArc((-0.785, -0.425), (-0.782071068, -0.432071068), (-0.775, -0.435))
        make_face()
    extrude(amount=BODY_EXTRUDE_DEPTH)


solid = Compound([part.part, body_2.part])
